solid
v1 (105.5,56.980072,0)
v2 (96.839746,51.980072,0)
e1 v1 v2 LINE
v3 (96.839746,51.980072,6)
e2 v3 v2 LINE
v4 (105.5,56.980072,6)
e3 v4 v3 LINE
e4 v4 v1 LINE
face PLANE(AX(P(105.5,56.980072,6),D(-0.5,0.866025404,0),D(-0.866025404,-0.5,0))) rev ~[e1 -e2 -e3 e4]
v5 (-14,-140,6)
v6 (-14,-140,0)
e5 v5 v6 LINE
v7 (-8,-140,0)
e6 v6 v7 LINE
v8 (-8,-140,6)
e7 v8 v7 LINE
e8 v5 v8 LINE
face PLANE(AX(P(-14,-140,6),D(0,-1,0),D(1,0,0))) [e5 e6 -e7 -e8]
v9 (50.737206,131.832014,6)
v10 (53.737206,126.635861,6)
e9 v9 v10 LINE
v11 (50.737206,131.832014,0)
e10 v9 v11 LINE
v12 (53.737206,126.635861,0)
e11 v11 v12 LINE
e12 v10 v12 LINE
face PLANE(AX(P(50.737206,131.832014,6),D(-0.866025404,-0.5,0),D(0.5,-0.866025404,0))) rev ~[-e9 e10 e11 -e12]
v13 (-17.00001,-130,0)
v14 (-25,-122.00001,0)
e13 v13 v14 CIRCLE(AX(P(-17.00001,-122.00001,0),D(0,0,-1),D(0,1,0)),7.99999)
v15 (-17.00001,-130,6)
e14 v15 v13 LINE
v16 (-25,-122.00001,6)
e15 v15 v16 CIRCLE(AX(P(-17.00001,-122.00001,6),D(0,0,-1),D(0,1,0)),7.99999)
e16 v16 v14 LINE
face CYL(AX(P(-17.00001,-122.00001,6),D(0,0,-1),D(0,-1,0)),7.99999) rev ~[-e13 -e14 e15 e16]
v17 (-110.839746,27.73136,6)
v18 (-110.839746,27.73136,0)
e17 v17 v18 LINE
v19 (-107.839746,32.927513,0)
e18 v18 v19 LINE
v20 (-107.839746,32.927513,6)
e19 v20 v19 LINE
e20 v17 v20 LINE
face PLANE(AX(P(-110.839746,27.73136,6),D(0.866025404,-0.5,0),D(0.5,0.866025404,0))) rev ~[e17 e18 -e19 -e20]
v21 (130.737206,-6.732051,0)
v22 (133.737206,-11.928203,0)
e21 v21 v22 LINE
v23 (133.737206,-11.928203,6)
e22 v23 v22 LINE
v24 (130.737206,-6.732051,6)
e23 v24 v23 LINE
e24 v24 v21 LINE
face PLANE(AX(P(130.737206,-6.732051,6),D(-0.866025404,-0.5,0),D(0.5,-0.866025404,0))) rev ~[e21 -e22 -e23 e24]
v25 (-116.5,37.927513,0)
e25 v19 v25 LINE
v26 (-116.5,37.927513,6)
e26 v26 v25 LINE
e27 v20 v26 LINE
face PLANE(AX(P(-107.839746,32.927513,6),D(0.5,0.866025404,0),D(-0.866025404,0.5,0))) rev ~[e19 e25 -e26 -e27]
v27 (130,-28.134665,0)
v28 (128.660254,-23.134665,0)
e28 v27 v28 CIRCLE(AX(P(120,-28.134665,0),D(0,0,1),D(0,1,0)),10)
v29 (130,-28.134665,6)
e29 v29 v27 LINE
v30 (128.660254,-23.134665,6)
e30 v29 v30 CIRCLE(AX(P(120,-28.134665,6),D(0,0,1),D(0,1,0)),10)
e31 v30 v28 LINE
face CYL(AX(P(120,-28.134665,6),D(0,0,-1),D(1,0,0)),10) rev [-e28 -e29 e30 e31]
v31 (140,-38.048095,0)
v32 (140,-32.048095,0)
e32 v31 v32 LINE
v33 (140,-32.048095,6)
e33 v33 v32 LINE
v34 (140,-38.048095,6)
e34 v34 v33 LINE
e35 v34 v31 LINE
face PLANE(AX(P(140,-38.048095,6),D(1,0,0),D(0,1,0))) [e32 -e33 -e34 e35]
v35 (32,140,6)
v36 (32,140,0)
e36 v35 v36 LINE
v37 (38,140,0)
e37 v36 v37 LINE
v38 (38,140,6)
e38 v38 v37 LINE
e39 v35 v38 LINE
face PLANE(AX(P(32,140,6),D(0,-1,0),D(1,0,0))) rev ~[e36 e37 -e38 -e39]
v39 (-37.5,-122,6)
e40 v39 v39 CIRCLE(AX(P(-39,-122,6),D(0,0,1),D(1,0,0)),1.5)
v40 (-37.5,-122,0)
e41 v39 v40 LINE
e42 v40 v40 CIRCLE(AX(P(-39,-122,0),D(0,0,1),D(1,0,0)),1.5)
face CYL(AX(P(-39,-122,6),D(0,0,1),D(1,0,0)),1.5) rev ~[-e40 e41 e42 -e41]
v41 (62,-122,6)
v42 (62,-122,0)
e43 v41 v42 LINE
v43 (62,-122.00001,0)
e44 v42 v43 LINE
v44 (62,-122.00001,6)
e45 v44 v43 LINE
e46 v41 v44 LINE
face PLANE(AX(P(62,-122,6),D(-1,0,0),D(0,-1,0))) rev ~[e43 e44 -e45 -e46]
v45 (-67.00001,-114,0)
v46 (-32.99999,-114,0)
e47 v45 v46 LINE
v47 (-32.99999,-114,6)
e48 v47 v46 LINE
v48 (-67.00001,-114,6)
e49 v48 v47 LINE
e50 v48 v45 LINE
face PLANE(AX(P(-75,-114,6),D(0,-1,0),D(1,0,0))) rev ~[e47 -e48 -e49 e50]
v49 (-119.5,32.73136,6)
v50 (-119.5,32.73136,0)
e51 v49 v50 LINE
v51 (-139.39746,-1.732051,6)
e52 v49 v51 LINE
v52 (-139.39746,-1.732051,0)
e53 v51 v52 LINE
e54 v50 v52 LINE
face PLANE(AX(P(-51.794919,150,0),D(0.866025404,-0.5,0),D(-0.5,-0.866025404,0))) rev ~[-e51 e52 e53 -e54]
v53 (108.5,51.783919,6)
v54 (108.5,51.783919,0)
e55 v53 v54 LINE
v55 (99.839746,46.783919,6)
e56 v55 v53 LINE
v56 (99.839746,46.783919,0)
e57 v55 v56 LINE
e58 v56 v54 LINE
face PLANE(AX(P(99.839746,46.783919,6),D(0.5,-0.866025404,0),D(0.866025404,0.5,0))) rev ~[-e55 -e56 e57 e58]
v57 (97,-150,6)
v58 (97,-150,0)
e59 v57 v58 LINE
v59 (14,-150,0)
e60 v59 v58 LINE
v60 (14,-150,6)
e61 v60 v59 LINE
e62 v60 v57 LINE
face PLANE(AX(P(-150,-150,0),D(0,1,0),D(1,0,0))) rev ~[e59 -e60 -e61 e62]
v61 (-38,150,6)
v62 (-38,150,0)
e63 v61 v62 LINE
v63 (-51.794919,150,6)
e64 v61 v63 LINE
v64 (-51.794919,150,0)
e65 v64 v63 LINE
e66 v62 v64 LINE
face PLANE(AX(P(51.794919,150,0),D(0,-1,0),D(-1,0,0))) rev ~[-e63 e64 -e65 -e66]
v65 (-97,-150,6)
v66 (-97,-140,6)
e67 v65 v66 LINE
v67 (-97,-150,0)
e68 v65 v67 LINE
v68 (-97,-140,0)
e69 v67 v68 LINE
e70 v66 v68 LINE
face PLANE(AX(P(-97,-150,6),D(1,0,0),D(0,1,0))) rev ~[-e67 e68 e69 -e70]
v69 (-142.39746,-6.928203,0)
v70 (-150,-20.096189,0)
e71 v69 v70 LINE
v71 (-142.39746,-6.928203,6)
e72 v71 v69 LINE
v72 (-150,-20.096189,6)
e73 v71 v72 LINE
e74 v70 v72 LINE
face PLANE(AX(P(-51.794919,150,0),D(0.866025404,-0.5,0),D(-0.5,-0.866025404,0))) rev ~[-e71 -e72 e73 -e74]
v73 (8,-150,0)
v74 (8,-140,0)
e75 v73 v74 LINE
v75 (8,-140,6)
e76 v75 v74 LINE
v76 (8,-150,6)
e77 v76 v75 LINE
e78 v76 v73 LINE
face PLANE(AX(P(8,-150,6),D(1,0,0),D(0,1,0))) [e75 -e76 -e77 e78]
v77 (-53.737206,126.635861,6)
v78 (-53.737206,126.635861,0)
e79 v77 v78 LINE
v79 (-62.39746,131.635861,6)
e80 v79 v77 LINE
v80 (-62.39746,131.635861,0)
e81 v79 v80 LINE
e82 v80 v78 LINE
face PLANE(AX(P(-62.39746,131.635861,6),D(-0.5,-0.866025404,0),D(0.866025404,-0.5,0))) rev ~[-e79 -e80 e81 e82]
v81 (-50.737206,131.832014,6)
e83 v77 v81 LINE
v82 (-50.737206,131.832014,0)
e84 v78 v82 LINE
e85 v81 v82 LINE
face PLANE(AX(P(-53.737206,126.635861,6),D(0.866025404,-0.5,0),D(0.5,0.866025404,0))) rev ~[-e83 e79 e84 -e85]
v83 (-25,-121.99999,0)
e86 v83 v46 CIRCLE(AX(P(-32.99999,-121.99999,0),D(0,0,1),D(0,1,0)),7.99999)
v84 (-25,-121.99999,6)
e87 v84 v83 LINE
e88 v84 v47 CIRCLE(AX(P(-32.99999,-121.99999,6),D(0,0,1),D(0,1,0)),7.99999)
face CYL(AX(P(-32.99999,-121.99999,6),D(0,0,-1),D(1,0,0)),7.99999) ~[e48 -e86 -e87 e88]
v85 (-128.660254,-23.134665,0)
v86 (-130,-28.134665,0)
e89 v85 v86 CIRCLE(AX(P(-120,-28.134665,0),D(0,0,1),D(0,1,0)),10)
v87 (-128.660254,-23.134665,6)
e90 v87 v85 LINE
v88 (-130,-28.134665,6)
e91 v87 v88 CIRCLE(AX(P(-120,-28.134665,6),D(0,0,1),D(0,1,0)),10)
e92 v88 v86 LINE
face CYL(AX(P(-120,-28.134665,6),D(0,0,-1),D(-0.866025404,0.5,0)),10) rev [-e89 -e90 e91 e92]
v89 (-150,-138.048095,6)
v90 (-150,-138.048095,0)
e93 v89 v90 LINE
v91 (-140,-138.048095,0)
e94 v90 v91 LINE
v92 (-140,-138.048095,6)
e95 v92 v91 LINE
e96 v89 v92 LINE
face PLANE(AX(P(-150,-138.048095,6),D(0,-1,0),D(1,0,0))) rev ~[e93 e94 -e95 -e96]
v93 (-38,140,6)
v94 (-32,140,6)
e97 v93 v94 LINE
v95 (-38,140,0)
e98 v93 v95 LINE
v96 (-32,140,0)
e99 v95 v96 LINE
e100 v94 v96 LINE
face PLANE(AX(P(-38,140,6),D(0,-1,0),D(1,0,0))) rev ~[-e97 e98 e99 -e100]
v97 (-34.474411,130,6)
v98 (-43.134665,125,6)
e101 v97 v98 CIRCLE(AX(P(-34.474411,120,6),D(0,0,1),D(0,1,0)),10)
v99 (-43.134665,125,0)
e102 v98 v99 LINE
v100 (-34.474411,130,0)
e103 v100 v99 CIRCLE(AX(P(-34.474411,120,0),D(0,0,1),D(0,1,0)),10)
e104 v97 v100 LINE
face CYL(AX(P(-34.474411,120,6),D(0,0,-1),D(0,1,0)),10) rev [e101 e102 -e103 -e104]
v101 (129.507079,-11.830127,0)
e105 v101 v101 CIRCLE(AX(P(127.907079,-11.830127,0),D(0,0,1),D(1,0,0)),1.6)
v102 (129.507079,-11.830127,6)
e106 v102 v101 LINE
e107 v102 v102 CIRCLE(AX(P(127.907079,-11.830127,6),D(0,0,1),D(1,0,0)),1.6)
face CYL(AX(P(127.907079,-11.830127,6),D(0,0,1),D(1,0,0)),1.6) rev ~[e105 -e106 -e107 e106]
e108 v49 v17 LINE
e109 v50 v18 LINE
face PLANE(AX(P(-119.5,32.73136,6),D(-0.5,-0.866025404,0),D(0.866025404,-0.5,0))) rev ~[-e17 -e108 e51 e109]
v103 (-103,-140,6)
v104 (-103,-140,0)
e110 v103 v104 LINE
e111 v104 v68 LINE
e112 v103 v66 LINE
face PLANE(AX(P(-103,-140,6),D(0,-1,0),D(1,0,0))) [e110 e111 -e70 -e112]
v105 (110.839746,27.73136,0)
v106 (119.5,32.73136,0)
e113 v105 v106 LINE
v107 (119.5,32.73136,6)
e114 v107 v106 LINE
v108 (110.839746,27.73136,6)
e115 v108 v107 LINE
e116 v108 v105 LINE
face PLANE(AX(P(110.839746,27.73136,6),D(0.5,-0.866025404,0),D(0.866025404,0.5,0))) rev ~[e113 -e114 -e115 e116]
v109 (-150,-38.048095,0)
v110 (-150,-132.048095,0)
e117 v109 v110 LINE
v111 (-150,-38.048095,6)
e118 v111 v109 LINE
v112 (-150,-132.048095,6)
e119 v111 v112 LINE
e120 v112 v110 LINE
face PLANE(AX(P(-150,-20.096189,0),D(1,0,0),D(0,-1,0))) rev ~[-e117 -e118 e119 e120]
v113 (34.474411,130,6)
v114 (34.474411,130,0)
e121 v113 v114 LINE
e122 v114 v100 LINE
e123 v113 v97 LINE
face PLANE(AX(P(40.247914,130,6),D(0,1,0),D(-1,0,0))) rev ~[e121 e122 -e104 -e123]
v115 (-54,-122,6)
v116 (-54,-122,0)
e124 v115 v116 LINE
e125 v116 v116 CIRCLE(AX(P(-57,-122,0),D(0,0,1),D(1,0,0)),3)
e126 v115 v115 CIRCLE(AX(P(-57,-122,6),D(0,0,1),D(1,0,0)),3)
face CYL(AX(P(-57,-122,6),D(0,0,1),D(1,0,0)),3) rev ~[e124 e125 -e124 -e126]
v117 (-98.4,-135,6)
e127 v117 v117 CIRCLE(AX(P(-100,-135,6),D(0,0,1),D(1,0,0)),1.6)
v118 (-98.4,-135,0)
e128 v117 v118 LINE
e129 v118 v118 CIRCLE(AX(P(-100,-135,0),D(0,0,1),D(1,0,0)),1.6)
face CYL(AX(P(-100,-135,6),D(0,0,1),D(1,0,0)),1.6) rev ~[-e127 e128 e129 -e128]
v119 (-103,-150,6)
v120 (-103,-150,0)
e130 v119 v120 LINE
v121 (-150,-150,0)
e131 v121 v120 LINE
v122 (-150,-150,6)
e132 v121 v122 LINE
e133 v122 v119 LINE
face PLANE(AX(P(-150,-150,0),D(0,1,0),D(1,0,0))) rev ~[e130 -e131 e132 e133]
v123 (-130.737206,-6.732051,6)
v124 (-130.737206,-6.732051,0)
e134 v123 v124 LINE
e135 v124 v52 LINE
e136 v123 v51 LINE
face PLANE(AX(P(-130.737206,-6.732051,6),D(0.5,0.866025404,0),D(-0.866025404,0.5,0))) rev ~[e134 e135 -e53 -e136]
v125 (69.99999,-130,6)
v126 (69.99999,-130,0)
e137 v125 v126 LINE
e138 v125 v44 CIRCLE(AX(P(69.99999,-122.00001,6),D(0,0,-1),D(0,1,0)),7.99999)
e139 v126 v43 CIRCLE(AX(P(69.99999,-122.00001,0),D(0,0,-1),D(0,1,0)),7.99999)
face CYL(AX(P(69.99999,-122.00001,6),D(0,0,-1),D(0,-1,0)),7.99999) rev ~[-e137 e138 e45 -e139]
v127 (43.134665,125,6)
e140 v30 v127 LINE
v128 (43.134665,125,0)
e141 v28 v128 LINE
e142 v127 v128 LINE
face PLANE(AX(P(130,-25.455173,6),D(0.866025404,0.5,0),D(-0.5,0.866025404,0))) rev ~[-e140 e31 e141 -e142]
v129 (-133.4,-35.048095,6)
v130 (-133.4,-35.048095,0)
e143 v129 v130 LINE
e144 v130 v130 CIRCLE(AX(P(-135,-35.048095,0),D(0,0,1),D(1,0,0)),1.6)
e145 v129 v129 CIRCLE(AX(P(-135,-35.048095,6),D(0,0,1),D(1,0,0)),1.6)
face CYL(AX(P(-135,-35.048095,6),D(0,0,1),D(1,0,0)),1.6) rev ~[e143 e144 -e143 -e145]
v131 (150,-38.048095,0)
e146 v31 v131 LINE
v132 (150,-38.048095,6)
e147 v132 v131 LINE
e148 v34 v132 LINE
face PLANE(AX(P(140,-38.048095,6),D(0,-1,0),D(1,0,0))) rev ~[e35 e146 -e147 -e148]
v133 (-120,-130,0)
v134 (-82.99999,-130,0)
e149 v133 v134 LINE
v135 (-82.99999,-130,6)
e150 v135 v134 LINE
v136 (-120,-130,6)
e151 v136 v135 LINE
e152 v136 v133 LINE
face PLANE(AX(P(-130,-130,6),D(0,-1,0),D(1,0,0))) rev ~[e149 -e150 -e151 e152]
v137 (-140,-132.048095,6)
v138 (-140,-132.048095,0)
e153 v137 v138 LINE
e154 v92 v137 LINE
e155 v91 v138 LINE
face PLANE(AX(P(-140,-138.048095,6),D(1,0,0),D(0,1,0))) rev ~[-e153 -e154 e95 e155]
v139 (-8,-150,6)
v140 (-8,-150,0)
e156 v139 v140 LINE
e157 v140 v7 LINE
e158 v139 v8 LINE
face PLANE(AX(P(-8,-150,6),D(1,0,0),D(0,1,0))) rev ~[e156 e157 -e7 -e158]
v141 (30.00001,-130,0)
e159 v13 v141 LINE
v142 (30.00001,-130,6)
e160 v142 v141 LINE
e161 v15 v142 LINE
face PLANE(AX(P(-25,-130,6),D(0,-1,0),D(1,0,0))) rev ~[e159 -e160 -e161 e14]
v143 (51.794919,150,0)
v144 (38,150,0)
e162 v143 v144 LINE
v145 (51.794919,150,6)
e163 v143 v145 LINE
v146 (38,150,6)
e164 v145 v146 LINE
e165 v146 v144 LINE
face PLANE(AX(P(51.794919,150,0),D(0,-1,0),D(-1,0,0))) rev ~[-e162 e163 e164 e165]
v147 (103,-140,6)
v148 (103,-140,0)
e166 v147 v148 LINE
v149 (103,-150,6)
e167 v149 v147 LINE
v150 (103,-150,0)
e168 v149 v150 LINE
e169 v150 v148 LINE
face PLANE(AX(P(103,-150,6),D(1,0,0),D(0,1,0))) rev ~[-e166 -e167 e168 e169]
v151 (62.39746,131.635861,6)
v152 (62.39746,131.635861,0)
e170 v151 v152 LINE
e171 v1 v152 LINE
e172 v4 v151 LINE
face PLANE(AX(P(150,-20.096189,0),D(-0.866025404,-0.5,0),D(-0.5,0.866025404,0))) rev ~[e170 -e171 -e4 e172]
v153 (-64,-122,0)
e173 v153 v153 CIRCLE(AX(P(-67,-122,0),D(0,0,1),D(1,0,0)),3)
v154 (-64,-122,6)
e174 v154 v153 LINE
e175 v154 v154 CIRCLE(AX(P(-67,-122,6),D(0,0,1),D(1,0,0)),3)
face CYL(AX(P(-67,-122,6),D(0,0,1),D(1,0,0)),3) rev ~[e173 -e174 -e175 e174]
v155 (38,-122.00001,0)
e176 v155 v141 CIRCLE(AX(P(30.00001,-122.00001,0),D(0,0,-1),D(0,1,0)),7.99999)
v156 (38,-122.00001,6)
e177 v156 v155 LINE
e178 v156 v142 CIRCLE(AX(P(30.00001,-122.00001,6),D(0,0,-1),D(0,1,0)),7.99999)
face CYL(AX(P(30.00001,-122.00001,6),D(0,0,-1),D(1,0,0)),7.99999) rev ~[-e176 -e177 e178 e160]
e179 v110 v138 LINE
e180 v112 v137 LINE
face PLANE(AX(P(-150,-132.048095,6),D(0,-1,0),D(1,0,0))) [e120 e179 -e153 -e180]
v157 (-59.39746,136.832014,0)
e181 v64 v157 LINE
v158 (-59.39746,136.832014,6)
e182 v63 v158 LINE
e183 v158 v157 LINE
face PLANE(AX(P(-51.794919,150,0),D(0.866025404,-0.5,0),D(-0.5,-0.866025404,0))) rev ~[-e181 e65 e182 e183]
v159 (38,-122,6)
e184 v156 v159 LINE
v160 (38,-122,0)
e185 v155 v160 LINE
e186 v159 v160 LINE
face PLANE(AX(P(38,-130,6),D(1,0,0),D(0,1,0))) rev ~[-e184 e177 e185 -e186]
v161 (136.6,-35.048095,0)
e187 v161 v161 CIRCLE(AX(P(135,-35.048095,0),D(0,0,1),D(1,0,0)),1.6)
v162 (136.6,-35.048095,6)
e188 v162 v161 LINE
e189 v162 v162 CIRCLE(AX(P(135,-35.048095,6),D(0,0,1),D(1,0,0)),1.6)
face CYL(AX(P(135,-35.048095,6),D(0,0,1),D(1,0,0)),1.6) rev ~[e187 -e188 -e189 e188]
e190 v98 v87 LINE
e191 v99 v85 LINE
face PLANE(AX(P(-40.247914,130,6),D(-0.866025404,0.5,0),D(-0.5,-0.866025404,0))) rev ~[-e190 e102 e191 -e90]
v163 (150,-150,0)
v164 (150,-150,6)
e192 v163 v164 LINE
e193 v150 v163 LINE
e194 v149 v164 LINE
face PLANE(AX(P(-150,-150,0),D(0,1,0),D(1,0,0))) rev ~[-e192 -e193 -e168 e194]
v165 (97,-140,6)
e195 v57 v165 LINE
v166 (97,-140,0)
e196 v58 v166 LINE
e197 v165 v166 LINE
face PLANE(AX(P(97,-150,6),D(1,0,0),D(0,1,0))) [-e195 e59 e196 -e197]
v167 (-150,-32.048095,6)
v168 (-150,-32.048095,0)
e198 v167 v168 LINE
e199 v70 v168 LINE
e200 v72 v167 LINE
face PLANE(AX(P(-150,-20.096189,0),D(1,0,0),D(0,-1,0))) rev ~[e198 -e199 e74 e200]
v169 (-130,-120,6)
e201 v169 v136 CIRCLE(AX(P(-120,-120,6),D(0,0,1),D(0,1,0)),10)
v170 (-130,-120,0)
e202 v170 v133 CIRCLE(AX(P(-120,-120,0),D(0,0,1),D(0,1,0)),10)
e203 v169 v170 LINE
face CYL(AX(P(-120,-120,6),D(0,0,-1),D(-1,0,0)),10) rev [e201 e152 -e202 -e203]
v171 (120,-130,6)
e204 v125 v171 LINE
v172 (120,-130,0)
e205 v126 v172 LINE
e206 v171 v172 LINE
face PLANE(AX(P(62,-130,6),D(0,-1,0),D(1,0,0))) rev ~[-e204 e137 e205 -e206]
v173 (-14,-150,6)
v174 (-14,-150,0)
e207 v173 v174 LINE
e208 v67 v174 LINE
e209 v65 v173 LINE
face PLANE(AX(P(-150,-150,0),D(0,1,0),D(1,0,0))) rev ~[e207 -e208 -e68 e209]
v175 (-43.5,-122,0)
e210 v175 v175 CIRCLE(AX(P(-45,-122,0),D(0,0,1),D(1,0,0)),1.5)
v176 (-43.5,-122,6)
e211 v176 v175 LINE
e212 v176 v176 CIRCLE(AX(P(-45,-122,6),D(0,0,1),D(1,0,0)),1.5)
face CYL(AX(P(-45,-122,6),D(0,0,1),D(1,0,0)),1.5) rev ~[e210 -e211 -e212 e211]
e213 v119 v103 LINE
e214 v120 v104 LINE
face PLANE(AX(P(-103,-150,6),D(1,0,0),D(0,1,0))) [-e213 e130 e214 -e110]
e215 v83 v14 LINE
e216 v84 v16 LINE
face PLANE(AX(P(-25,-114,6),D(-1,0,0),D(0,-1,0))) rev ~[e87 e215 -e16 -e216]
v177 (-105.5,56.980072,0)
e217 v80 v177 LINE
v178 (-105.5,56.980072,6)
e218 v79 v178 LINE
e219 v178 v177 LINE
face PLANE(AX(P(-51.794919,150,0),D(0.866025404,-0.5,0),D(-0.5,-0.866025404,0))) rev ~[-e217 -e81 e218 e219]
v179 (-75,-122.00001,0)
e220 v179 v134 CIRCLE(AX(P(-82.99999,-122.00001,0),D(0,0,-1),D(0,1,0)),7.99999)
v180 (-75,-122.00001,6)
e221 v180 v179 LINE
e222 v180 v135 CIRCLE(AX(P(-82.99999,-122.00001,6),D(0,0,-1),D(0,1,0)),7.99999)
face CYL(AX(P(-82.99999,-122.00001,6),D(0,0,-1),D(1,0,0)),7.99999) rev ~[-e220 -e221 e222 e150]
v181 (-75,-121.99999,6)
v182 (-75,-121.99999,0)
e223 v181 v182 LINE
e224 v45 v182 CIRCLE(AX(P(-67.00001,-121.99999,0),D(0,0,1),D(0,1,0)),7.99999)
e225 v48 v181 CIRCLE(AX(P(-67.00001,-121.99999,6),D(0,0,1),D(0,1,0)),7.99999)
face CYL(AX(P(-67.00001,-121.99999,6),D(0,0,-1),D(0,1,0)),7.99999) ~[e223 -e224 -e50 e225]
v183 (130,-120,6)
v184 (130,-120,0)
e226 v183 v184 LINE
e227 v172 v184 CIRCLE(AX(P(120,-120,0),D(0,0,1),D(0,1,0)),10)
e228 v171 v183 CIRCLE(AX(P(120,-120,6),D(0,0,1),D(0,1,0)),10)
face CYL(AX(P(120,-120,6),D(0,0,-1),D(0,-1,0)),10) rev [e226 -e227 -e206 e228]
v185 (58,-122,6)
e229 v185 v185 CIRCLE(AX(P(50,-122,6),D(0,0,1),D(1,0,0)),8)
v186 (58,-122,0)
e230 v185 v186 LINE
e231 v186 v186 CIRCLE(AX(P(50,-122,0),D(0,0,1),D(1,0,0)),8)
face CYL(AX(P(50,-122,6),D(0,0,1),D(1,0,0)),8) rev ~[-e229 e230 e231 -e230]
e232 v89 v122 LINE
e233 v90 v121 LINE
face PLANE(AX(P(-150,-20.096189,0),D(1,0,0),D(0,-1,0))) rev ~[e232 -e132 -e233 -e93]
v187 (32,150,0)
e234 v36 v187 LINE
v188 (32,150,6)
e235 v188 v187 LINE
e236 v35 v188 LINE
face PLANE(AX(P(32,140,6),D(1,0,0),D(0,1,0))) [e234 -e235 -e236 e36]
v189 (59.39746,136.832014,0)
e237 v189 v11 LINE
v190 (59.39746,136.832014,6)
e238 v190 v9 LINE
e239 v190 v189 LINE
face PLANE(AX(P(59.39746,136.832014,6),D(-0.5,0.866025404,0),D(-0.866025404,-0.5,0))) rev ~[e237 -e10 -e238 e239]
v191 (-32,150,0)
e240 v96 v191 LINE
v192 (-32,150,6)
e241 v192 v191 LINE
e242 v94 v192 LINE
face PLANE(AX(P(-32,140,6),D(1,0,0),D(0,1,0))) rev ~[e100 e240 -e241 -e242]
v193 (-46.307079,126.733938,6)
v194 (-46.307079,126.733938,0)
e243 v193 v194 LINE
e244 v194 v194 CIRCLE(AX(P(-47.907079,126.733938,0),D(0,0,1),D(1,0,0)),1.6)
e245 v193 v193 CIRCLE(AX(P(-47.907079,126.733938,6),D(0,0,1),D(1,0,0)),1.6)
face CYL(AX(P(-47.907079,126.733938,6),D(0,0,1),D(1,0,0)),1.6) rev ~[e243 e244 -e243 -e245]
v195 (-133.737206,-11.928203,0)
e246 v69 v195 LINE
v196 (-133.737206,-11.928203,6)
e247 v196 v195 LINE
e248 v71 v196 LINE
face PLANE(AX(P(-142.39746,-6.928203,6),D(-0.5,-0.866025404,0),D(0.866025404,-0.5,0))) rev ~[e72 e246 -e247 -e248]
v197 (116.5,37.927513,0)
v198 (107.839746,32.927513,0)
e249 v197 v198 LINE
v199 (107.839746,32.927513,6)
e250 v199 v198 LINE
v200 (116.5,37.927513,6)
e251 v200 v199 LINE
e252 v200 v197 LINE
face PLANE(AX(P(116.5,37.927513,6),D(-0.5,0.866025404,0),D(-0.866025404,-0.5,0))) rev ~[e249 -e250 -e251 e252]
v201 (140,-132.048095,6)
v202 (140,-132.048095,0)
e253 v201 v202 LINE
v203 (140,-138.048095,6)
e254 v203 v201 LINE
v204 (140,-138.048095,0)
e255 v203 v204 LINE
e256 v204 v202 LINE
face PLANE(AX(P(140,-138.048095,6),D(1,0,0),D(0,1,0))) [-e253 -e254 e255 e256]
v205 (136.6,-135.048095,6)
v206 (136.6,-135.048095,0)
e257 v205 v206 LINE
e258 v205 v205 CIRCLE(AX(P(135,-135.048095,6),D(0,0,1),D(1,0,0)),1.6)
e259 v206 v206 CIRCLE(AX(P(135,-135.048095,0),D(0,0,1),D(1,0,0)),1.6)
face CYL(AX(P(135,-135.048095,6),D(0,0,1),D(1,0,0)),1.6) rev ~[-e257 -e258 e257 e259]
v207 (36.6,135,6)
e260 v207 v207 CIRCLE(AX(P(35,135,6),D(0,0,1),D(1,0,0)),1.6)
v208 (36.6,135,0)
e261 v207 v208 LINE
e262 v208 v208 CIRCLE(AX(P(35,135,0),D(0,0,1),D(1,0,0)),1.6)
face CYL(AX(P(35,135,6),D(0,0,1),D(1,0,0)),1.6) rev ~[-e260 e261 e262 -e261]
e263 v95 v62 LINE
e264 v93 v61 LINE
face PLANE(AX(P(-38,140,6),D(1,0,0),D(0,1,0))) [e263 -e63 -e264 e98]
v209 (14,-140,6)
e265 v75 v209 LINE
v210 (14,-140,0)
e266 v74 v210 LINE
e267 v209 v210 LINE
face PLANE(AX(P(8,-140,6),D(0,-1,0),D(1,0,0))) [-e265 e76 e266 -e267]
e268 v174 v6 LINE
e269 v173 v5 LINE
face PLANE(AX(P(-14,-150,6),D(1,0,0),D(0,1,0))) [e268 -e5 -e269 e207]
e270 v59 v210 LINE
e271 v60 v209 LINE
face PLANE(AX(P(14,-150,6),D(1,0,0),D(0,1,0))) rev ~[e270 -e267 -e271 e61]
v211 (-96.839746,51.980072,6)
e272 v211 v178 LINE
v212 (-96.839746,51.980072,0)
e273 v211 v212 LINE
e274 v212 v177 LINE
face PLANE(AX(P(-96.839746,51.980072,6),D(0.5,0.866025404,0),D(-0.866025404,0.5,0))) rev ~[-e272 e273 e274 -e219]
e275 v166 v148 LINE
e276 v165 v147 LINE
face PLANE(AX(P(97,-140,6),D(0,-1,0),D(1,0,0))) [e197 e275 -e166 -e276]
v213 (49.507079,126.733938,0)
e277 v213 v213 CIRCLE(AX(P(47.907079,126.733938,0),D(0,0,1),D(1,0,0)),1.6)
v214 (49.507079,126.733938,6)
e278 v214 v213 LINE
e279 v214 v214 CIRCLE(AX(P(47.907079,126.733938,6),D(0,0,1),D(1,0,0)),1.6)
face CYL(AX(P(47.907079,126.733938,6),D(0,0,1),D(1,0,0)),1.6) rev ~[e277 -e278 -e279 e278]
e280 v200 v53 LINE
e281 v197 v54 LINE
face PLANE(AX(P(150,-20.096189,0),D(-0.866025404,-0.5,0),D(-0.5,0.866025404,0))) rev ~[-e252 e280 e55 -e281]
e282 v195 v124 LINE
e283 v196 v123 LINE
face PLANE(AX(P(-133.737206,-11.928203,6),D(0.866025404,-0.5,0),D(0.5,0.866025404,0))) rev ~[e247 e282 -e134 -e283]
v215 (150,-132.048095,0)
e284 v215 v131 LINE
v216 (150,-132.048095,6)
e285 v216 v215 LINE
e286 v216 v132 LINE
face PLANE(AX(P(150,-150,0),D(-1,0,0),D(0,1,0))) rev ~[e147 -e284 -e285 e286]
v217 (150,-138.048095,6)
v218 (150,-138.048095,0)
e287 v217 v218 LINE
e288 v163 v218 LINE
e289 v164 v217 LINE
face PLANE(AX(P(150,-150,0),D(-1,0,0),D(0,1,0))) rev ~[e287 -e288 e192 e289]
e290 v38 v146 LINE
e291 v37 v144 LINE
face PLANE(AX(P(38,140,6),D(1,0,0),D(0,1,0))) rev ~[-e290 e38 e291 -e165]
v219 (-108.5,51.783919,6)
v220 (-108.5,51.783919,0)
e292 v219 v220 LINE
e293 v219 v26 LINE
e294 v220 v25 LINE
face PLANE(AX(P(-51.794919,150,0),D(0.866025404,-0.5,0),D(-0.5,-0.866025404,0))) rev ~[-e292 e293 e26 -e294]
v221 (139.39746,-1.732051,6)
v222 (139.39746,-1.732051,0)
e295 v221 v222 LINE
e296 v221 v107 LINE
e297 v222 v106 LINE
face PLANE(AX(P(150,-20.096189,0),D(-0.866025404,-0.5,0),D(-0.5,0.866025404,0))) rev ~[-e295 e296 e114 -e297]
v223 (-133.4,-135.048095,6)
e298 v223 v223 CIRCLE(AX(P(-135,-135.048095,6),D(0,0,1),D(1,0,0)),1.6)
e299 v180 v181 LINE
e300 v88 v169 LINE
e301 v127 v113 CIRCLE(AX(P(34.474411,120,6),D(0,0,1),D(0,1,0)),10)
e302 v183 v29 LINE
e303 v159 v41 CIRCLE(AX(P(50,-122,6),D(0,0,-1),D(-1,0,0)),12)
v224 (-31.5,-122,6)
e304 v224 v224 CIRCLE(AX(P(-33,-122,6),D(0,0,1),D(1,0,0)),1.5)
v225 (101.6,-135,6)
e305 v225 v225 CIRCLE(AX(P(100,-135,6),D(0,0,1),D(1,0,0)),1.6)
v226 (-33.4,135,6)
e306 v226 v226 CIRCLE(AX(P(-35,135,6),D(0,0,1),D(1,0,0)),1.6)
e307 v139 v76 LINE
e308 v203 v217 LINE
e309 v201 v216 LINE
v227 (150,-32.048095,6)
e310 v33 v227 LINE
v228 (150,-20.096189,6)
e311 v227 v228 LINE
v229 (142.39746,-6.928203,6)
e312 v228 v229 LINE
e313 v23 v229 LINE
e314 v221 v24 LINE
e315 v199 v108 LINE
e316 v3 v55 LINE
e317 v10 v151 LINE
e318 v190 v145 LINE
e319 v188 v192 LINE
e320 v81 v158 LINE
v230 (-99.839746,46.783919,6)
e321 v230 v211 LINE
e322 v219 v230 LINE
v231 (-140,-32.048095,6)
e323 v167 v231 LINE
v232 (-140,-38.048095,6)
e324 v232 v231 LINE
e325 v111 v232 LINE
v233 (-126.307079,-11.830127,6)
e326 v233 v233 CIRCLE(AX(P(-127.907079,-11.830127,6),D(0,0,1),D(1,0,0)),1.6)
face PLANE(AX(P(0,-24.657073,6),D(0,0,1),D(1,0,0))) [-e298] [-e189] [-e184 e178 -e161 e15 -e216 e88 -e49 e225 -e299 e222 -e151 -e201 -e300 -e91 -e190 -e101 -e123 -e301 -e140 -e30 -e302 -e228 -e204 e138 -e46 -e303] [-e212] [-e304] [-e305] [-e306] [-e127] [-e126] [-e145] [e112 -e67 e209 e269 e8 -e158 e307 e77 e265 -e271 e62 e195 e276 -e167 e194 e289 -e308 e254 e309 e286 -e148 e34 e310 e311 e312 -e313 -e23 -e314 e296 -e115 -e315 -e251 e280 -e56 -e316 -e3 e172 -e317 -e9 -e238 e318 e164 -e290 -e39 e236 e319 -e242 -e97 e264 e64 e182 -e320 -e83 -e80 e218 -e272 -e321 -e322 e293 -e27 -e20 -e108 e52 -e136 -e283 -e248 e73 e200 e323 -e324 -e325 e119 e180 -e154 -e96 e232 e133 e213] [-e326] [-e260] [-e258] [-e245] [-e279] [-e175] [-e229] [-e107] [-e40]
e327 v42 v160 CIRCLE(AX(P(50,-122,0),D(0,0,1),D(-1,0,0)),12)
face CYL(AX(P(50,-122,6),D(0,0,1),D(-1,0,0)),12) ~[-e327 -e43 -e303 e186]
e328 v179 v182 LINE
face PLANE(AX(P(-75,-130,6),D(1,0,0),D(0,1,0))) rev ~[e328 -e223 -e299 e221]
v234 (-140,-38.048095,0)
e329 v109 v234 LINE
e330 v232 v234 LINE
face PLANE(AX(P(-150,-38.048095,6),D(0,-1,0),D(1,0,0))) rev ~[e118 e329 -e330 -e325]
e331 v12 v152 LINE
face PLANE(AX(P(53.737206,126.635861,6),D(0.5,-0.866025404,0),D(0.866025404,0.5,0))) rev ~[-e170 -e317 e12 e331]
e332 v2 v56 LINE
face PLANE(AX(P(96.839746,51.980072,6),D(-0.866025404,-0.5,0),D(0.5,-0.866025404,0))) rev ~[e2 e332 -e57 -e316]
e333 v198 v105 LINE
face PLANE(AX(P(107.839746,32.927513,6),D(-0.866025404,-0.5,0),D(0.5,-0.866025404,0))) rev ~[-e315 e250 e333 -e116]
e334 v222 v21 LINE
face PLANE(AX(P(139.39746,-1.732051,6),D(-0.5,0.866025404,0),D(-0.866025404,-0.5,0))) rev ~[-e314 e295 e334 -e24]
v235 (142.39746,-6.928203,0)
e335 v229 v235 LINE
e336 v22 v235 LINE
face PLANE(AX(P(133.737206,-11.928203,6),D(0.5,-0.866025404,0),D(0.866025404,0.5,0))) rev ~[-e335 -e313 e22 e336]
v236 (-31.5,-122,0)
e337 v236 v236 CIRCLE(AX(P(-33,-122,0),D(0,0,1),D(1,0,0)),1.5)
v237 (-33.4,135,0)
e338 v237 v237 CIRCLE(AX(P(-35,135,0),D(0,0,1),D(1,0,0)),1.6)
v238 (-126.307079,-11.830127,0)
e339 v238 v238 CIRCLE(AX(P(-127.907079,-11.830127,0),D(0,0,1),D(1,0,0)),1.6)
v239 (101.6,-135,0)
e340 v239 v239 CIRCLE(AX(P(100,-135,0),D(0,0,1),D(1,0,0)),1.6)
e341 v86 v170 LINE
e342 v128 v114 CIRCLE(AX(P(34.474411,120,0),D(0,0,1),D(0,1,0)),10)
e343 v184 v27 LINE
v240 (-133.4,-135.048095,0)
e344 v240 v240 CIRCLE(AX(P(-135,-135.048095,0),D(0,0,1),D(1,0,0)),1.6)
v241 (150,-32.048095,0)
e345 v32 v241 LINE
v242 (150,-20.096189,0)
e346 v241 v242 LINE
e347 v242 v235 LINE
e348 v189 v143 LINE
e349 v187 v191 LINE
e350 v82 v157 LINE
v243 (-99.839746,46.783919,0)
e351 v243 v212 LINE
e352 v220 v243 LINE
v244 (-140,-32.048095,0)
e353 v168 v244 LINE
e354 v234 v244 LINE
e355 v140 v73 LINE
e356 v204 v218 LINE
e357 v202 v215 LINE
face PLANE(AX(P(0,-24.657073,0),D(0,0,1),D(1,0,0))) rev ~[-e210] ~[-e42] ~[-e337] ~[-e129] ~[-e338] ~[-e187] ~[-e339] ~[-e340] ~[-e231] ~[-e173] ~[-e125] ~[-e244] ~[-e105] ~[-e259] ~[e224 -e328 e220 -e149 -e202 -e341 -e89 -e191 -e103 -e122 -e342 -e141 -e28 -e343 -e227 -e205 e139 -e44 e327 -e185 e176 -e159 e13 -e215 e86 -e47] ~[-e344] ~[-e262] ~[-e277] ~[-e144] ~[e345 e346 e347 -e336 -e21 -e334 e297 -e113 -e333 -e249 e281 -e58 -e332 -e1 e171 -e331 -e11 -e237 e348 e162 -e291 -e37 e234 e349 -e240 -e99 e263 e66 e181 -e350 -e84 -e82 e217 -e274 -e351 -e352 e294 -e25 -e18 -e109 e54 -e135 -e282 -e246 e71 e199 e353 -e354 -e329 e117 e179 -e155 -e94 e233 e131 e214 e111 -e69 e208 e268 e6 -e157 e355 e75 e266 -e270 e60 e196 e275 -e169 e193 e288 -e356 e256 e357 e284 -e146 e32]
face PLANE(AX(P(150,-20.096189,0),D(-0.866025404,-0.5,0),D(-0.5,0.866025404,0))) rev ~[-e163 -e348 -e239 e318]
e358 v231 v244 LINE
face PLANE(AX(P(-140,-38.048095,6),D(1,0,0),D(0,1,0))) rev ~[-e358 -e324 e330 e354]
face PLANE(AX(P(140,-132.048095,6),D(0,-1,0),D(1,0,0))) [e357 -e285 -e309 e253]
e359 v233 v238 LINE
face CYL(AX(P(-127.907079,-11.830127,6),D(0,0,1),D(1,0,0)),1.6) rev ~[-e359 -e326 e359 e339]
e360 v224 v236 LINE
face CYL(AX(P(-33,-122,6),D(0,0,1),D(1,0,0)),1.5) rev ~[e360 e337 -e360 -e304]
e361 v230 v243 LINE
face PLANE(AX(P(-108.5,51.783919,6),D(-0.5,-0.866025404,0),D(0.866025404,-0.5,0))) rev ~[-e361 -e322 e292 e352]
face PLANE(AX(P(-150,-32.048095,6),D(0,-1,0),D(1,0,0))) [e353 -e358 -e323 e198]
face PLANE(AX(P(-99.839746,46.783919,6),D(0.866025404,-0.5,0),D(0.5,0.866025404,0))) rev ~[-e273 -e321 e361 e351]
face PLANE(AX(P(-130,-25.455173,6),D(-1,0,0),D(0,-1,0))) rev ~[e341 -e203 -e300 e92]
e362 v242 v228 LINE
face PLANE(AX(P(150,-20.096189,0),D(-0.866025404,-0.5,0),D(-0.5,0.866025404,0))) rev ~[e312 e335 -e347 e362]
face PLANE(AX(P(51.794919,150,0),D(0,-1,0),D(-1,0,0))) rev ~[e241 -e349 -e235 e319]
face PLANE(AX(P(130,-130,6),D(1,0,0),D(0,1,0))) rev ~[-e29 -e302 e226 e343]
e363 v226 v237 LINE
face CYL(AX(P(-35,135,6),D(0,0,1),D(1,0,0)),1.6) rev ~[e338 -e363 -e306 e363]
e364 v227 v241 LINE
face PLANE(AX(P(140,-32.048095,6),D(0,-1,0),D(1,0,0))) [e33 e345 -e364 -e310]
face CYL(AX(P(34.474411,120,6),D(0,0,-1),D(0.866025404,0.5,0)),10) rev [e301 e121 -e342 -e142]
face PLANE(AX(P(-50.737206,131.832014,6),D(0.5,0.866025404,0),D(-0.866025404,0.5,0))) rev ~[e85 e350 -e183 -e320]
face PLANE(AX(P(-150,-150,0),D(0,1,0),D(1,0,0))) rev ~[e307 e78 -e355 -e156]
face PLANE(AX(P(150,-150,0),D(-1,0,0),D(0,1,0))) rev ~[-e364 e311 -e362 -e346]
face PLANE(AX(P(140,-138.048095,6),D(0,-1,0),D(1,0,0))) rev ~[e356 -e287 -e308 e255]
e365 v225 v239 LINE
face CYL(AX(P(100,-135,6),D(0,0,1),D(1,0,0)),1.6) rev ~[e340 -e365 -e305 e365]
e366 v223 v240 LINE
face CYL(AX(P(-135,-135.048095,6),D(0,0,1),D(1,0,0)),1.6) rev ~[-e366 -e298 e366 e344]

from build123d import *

# Parameters (mm, degrees)
F1_DEPTH  = 6
F2_R      = 1.6
F2_W      = 10
F2_H      = 6
F2_W_2    = 6
F2_H_2    = 10
F3_DEPTH  = 6.001
F4_W      = 6
F4_H      = 10
F5_DEPTH  = 6.001
F7_DEPTH  = 6.001
F8_R      = 10
F9_R      = 8
F9_R_2    = 3
F9_R_3    = 1.5
F10_DEPTH = 6.001
F11_R     = 7.99999


# Not quite as in the source:
# - a fillet or chamfer is up to 0.001 mm smaller than in the source, because OpenCascade refuses the exact size


with BuildPart() as f1:
    # F0 (on Top) → F1 (new body)
    with BuildSketch(Plane.XY):
        Polygon((-150, -150), (150, -150), (150, -20.0961894323), (51.7949192431, 150), (-51.7949192431, 150), (-150, -20.0961894323), align=None)
    extrude(amount=F1_DEPTH)

    # F2 (on face) → F3 (cut, through all)
    with BuildSketch(Plane.XY.offset(6)):
        Polygon((-139.3974596216, -1.7320508076), (-142.3974596216, -6.9282032303), (-133.7372055837, -11.9282032303), (-130.7372055837, -6.7320508076), align=None)
        with Locations((-127.9070785648, -11.8301270189)):
            Circle(F2_R)
        Polygon((-50.7372055837, 131.8320137979), (-59.3974596216, 136.8320137979), (-62.3974596216, 131.6358613752), (-53.7372055837, 126.6358613752), align=None)
        with Locations((-47.9070785648, 126.7339375866)):
            Circle(F2_R)
        Polygon((133.7372055837, -11.9282032303), (142.3974596216, -6.9282032303), (139.3974596216, -1.7320508076), (130.7372055837, -6.7320508076), align=None)
        with Locations((127.9070785648, -11.8301270189)):
            Circle(F2_R)
        Polygon((53.7372055837, 126.6358613752), (62.3974596216, 131.6358613752), (59.3974596216, 136.8320137979), (50.7372055837, 131.8320137979), align=None)
        with Locations((47.9070785648, 126.7339375866)):
            Circle(F2_R)
        with Locations((-145, -35.0480947162)):
            Rectangle(F2_W, F2_H)
        with Locations((-135, -35.0480947162)):
            Circle(F2_R)
        with Locations((-145, -135.0480947162)):
            Rectangle(F2_W, F2_H)
        with Locations((-135, -135.0480947162)):
            Circle(F2_R)
        with Locations((145, -135.0480947162)):
            Rectangle(F2_W, F2_H)
        with Locations((135, -135.0480947162)):
            Circle(F2_R)
        with Locations((135, -35.0480947162)):
            Circle(F2_R)
        with Locations((145, -35.0480947162)):
            Rectangle(F2_W, F2_H)
        with Locations((-35, 145)):
            Rectangle(F2_W_2, F2_H_2)
        with Locations((-35, 135)):
            Circle(F2_R)
        with Locations((35, 145)):
            Rectangle(F2_W_2, F2_H_2)
        with Locations((35, 135)):
            Circle(F2_R)
        with Locations((-100, -145)):
            Rectangle(F2_W_2, F2_H_2)
        with Locations((-100, -135)):
            Circle(F2_R)
        with Locations((100, -135)):
            Circle(F2_R)
        with Locations((100, -145)):
            Rectangle(F2_W_2, F2_H_2)
    extrude(amount=-F3_DEPTH, mode=Mode.SUBTRACT)

    # F4 (on face) → F5 (cut, through all)
    with BuildSketch(Plane.XY.offset(6)):
        with Locations((-11, -145)):
            Rectangle(F4_W, F4_H)
        with Locations((11, -145)):
            Rectangle(F4_W, F4_H)
        Polygon((-107.8397459622, 32.9275126212), (-116.5, 37.9275126212), (-119.5, 32.7313601985), (-110.8397459622, 27.7313601985), align=None)
        Polygon((-105.5, 56.9800715045), (-108.5, 51.7839190818), (-99.8397459622, 46.7839190818), (-96.8397459622, 51.9800715045), align=None)
        Polygon((107.8397459622, 32.9275126212), (110.8397459622, 27.7313601985), (119.5, 32.7313601985), (116.5, 37.9275126212), align=None)
        Polygon((105.5, 56.9800715045), (96.8397459622, 51.9800715045), (99.8397459622, 46.7839190818), (108.5, 51.7839190818), align=None)
    extrude(amount=-F5_DEPTH, mode=Mode.SUBTRACT)

    # F6 (on face) → F7 (cut, through all)
    with BuildSketch(Plane.XY.offset(6)):
        with BuildLine():
            Line((62, -130), (130, -130))
            Line((130, -130), (130, -25.455173281))
            Line((130, -25.455173281), (40.2479138593, 130))
            Line((40.2479138593, 130), (-40.2479138593, 130))
            Line((-40.2479138593, 130), (-130, -25.455173281))
            Line((-130, -25.455173281), (-130, -130))
            Line((-130, -130), (-75, -130))
            Line((-75, -130), (-75, -114))
            Line((-75, -114), (-25, -114))
            Line((-25, -114), (-25, -130))
            Line((-25, -130), (38, -130))
            Line((38, -130), (38, -122))
            ThreePointArc((38, -122), (50, -110), (62, -122))
            Line((62, -122), (62, -130))
        make_face()
    extrude(amount=-F7_DEPTH, mode=Mode.SUBTRACT)

    # F8
    f8_edges = [f1.edges().sort_by_distance(p)[0] for p in [
        (-40.247914, 130, 3),
        (-130, -25.455173, 3),
        (130, -25.455173, 3),
        (40.247914, 130, 3),
        (130, -130, 3),
        (-130, -130, 3),
    ]]
    fillet(f8_edges, radius=F8_R)

    # F9 (on face) → F10 (cut, through all)
    with BuildSketch(Plane.XY.offset(6)):
        with Locations((50, -122)):
            Circle(F9_R)
        with Locations((-67, -122)):
            Circle(F9_R_2)
        with Locations((-57, -122)):
            Circle(F9_R_2)
        with Locations((-39, -122)):
            Circle(F9_R_3)
        with Locations((-33, -122)):
            Circle(F9_R_3)
        with Locations((-45, -122)):
            Circle(F9_R_3)
    extrude(amount=-F10_DEPTH, mode=Mode.SUBTRACT)

    # F11 (radius 8 in the source; OpenCascade refuses exactly that, so slightly less here)
    f11_edges = [f1.edges().sort_by_distance(p)[0] for p in [
        (-75, -130, 3),
        (-75, -114, 3),
        (-25, -114, 3),
        (-25, -130, 3),
        (62, -130, 3),
        (38, -130, 3),
    ]]
    fillet(f11_edges, radius=F11_R)


solid = f1.part
